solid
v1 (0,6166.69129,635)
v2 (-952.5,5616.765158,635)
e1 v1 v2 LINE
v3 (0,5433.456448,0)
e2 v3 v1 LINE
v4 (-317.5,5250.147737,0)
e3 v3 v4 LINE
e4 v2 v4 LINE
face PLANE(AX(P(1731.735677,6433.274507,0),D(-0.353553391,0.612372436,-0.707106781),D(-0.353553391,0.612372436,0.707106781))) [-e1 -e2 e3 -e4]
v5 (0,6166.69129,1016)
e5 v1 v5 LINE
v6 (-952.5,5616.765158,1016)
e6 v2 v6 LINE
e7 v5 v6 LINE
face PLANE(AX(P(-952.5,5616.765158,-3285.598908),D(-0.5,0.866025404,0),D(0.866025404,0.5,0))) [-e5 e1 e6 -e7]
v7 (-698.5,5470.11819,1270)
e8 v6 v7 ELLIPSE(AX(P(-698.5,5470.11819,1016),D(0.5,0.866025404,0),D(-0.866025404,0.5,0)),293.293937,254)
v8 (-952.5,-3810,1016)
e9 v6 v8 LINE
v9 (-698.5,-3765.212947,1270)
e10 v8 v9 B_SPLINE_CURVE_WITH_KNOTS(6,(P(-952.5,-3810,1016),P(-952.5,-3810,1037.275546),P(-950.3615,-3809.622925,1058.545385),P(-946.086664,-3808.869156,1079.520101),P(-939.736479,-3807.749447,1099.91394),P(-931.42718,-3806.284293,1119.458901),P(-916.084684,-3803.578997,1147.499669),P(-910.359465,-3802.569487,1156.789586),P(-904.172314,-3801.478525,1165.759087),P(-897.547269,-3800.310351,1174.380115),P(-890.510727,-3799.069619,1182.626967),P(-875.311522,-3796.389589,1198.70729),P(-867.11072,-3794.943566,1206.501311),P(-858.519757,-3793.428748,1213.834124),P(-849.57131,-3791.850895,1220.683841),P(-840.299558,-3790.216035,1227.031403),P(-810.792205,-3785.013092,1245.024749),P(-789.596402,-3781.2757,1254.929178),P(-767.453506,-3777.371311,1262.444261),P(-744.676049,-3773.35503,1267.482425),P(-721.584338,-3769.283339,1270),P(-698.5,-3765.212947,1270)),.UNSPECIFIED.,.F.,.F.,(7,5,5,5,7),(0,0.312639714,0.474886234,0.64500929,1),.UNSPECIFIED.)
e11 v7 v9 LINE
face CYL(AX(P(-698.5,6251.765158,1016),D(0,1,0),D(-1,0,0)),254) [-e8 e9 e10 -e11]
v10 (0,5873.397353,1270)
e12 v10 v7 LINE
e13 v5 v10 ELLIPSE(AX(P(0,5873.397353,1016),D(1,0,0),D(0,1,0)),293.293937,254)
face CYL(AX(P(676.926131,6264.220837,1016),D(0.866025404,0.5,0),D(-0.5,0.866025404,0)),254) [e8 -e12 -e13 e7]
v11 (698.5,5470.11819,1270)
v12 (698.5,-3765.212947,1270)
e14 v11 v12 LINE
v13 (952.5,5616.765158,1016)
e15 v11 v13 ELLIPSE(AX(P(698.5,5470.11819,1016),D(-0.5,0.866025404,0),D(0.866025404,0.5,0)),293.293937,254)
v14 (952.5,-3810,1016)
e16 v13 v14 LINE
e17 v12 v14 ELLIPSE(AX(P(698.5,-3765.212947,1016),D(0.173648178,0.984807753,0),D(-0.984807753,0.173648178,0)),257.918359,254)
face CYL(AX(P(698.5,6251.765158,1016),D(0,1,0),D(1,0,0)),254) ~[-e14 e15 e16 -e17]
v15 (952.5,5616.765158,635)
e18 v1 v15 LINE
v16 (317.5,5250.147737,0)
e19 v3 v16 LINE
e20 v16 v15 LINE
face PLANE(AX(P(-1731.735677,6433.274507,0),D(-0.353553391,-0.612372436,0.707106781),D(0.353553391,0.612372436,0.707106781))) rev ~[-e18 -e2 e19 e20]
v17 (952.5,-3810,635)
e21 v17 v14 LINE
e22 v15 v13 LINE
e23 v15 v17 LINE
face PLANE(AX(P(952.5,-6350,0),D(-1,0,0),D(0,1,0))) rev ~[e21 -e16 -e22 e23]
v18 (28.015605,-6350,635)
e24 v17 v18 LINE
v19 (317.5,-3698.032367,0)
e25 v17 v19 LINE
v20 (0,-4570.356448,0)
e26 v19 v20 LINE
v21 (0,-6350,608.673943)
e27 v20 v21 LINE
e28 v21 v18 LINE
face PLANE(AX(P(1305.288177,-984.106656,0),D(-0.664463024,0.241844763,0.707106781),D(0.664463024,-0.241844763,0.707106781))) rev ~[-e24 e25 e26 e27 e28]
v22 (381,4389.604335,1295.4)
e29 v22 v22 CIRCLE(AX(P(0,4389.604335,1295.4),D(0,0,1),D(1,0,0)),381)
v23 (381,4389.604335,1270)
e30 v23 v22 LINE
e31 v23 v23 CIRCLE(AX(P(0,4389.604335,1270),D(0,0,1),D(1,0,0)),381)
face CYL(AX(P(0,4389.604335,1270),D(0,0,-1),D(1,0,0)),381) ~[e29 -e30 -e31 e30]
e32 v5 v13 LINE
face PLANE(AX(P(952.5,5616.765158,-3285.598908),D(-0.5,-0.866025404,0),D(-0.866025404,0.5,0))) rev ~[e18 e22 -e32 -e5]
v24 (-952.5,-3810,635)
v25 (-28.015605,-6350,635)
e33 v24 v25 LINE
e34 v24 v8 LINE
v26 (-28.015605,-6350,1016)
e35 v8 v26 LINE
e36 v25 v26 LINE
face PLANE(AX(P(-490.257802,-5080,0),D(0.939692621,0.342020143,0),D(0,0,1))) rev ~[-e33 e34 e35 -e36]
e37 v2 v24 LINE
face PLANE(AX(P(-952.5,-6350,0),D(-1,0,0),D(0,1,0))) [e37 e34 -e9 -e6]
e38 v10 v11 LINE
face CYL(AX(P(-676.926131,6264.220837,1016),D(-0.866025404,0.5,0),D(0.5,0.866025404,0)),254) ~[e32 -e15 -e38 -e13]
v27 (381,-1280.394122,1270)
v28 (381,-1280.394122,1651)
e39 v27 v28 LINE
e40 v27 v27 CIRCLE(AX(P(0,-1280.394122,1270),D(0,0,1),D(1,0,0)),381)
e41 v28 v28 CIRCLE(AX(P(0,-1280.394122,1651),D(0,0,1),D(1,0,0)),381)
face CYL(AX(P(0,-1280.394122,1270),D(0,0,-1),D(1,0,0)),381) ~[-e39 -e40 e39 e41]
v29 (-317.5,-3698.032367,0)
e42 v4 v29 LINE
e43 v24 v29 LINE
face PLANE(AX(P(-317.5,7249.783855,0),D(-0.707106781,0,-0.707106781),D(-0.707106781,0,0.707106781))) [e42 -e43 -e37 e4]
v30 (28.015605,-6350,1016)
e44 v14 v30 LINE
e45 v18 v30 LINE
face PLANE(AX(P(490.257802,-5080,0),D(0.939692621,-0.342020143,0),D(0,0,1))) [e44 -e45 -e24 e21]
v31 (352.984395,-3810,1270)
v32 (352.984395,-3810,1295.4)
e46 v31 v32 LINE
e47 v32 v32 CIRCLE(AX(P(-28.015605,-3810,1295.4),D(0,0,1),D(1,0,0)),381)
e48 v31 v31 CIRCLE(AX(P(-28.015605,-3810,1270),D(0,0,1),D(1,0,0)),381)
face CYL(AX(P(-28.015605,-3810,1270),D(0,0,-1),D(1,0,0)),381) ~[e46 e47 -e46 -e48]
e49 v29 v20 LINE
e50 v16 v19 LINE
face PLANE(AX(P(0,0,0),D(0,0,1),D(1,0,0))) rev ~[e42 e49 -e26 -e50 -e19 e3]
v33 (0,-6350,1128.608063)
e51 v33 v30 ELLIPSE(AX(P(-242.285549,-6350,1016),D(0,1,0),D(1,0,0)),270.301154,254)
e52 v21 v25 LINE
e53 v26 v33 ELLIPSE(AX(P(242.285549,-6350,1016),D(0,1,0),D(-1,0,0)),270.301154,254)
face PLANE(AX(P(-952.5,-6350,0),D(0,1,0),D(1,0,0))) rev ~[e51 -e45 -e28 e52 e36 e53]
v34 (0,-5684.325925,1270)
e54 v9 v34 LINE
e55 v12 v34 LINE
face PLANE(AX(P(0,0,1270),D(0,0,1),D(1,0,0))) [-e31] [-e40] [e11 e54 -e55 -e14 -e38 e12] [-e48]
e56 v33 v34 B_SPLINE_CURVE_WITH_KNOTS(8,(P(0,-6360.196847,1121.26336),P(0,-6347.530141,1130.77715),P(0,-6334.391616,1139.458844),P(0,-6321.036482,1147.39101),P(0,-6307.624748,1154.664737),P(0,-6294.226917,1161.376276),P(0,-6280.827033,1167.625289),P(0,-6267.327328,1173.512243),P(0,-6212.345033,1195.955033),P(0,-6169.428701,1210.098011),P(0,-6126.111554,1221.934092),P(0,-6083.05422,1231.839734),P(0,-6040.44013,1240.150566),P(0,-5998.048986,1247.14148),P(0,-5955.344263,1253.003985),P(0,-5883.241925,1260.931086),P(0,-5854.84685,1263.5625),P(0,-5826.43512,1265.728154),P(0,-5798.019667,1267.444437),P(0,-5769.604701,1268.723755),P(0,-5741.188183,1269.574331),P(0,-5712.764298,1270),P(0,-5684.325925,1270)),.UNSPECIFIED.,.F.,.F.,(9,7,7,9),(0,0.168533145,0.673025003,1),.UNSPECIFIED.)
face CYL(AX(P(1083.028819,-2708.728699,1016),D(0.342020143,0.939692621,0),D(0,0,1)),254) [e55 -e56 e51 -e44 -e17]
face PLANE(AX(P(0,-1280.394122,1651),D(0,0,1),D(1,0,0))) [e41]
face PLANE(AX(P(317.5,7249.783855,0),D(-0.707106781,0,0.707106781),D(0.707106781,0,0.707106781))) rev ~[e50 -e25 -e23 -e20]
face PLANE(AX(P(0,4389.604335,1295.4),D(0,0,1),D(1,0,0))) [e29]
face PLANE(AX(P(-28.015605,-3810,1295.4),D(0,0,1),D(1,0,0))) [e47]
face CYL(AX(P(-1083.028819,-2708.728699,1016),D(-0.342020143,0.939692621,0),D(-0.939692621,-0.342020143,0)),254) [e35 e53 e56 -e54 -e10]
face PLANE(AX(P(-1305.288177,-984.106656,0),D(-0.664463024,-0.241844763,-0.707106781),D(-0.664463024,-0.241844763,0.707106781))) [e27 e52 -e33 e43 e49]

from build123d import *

# Parameters (mm, degrees)
F0_W          = 1905
F0_H          = 12700
F1_DEPTH      = 1270
F2_SIZE2      = 924.4843950362
F2_SIZE       = 2540
F2_2_SIZE2    = 924.4843950362
F2_2_SIZE     = 2540
F3_T1_DEPTH   = 7841.1978168008
F4_R          = 381
F5_DEPTH      = 381
F6_R          = 381
F7_DEPTH      = 25.4
F8_R          = 381
F9_DEPTH      = 25.4
F10_T1_DEPTH  = 7112.1620249564
F10_T3_DEPTH  = 13835.9156409968
F10_T5_DEPTH  = 4365.8896575229
F10_T7_DEPTH  = 4365.8896575229
F10_T9_DEPTH  = 7112.1620249564
F10_T14_DEPTH = 3322.0686046444
F10_T19_DEPTH = 3322.0686046444
F11_T1_DEPTH  = 11141.2651581292
F11_T3_DEPTH  = 4417.5115420888
F11_T5_DEPTH  = 4417.5115420888
F11_T7_DEPTH  = 2369.8522628062
F11_T9_DEPTH  = 2369.8522628062


# Not quite as in the source:
# - a fillet or chamfer that OpenCascade refuses, or shapes differently, is made with other operations: its cross-section is extruded or revolved along the edge and cut away or added


with BuildPart() as f1:
    # F0 (on Top) → F1 (new body)
    with BuildSketch(Plane.XY):
        Rectangle(F0_W, F0_H)
    extrude(amount=F1_DEPTH)

    # F2
    f2_edges = [f1.edges().sort_by_distance(p)[0] for p in [
        (952.5, -6350, 635),
    ]]
    f2_side = f1.faces().sort_by_distance((952.5, 0, 635))[0]
    chamfer(f2_edges, length=F2_SIZE, length2=F2_SIZE2, reference=f2_side)

    # F2#2
    f2_2_edges = [f1.edges().sort_by_distance(p)[0] for p in [
        (-952.5, -6350, 635),
    ]]
    f2_2_side = f1.faces().sort_by_distance((-952.5, 0, 635))[0]
    chamfer(f2_2_edges, length=F2_2_SIZE, length2=F2_2_SIZE2, reference=f2_2_side)

    # F3: chamfer of 1270 x 733.2348418708 on 2 edges, made by hand

    # F3_s2 → F3_t1 (cut)
    with BuildSketch(Plane.XY.offset(-3285.5989084004)):
        Polygon((952.5, 5616.7651581292), (-317.5, 6350), (952.5, 6350), align=None)
        Polygon((-952.5, 5616.7651581292), (317.5, 6350), (-952.5, 6350), align=None)
    extrude(amount=F3_T1_DEPTH, mode=Mode.SUBTRACT)

    # F4 (on face) → F5 (join)
    with BuildSketch(Plane.XY.offset(1270)):
        with Locations((0, -1280.3941220168)):
            Circle(F4_R)
    extrude(amount=F5_DEPTH)

    # F6 (on face) → F7 (join)
    with BuildSketch(Plane.XY.offset(1270)):
        with Locations((0, 4389.6043354776)):
            Circle(F6_R)
    extrude(amount=F7_DEPTH)

    # F8 (on face) → F9 (join)
    with BuildSketch(Plane.XY.offset(1270)):
        with Locations((-28.0156049638, -3810)):
            Circle(F8_R)
    extrude(amount=F9_DEPTH)

    # F10: chamfer of 635 on 7 edges, made by hand

    # F10_s2 → F10_t1 (cut)
    with BuildSketch(Plane(origin=(163.5960713175, -449.4765118562, 0), x_dir=(0, 0, 1), z_dir=(0.3420201433, -0.9396926208, 0))):
        Polygon((0, 1563.1539673694), (635, 2198.1539673694), (0, 2198.1539673694), align=None)
    extrude(amount=F10_T1_DEPTH, mode=Mode.SUBTRACT)

    # F10_s4 → F10_t3 (cut)
    with BuildSketch(Plane.XZ.offset(-7249.7838554876)):
        Polygon((-317.5, 0), (-952.5, 635), (-952.5, 0), align=None)
        Polygon((317.5, 0), (952.5, 635), (952.5, 0), align=None)
    extrude(amount=F10_T3_DEPTH, mode=Mode.SUBTRACT)

    # F10_s6 → F10_t5 (cut)
    with BuildSketch(Plane(origin=(4084.4913337829, 2358.1821710622, 0), x_dir=(0, 0, 1), z_dir=(-0.8660254038, -0.5, 0))):
        Polygon((0, 4705.5113140312), (635, 5340.5113140312), (0, 5340.5113140312), align=None)
    extrude(amount=F10_T5_DEPTH, mode=Mode.SUBTRACT)

    # F10_s8 → F10_t7 (cut)
    with BuildSketch(Plane(origin=(-4084.4913337829, 2358.1821710622, 0), x_dir=(0, 0, 1), z_dir=(0.8660254038, -0.5, 0))):
        Polygon((0, -4705.5113140312), (635, -5340.5113140312), (0, -5340.5113140312), align=None)
    extrude(amount=F10_T7_DEPTH, mode=Mode.SUBTRACT)

    # F10_s10 → F10_t9 (cut)
    with BuildSketch(Plane(origin=(-163.5960713175, -449.4765118562, 0), x_dir=(0, 0, 1), z_dir=(-0.3420201433, -0.9396926208, 0))):
        Polygon((0, -1563.1539673694), (635, -2198.1539673694), (0, -2198.1539673694), align=None)
    extrude(amount=F10_T9_DEPTH, mode=Mode.SUBTRACT)


with BuildPart() as f10_tool12:
    # F10_s13 → F10_t14 (new body)
    with BuildSketch(Plane.YZ.offset(-1661.0343023222)):
        Polygon((-6350, 635), (-5715, 0), (-6350, 0), align=None)
    extrude(amount=F10_T14_DEPTH)

    split(bisect_by=Plane(origin=(-734.4421241446, -267.3150719799, -781.5769836847), x_dir=(0.3420201433, -0.9396926208, 0), z_dir=(-0.6644630244, -0.2418447626, -0.7071067812)), keep=Keep.TOP)


with BuildPart() as f1_1:
    add(f1.part)

    # F10_t11: cut F10_tool12
    add(f10_tool12.part, mode=Mode.SUBTRACT)


with BuildPart() as f10_tool17:
    # F10_s18 → F10_t19 (new body)
    with BuildSketch(Plane.YZ.offset(-1661.0343023222)):
        Polygon((-6350, 635), (-5715, 0), (-6350, 0), align=None)
    extrude(amount=F10_T19_DEPTH)

    split(bisect_by=Plane(origin=(734.4421241446, -267.3150719799, -781.5769836847), x_dir=(0.3420201433, 0.9396926208, 0), z_dir=(0.6644630244, -0.2418447626, -0.7071067812)), keep=Keep.TOP)


with BuildPart() as f1_2:
    add(f1_1.part)

    # F10_t16: cut F10_tool17
    add(f10_tool17.part, mode=Mode.SUBTRACT)

    # F11: fillet of radius 254 on 6 edges, made by hand

    # F11_s2 → F11_t1 (cut)
    with BuildSketch(Plane.XZ.offset(-6251.7651581292)):
        with BuildLine():
            ThreePointArc((952.5, 1016), (878.1051224214, 1195.6051224214), (698.5, 1270))
            Line((698.5, 1270), (952.5, 1270))
            Line((952.5, 1270), (952.5, 1016))
        make_face()
        with BuildLine():
            ThreePointArc((-952.5, 1016), (-878.1051224214, 1195.6051224214), (-698.5, 1270))
            Line((-698.5, 1270), (-952.5, 1270))
            Line((-952.5, 1270), (-952.5, 1016))
        make_face()
    extrude(amount=F11_T1_DEPTH, mode=Mode.SUBTRACT)

    # F11_s4 → F11_t3 (cut)
    with BuildSketch(Plane(origin=(-743.8783177682, -2043.78888089, 0), x_dir=(0, 0, 1), z_dir=(-0.3420201433, -0.9396926208, 0))):
        with BuildLine():
            ThreePointArc((1270, -1944.1539673694), (1195.6051224214, -2123.7590897908), (1016, -2198.1539673694))
            Line((1016, -2198.1539673694), (1270, -2198.1539673694))
            Line((1270, -2198.1539673694), (1270, -1944.1539673694))
        make_face()
    extrude(amount=F11_T3_DEPTH, mode=Mode.SUBTRACT)

    # F11_s6 → F11_t5 (cut)
    with BuildSketch(Plane(origin=(743.8783177682, -2043.7888808901, 0), x_dir=(0, 0, 1), z_dir=(0.3420201433, -0.9396926208, 0))):
        with BuildLine():
            ThreePointArc((1016, 2198.1539673694), (1195.6051224214, 2123.7590897907), (1270, 1944.1539673694))
            Line((1270, 1944.1539673694), (1270, 2198.1539673694))
            Line((1270, 2198.1539673694), (1016, 2198.1539673694))
        make_face()
    extrude(amount=F11_T5_DEPTH, mode=Mode.SUBTRACT)

    # F11_s8 → F11_t7 (cut)
    with BuildSketch(Plane(origin=(3220.1817884187, 1859.172822383, 0), x_dir=(0, 0, 1), z_dir=(-0.8660254038, -0.5, 0))):
        with BuildLine():
            ThreePointArc((1016, 5340.5113140312), (1195.6051224214, 5266.1164364526), (1270, 5086.5113140312))
            Line((1270, 5086.5113140312), (1270, 5340.5113140312))
            Line((1270, 5340.5113140312), (1016, 5340.5113140312))
        make_face()
    extrude(amount=F11_T7_DEPTH, mode=Mode.SUBTRACT)

    # F11_s10 → F11_t9 (cut)
    with BuildSketch(Plane(origin=(-3220.1817884187, 1859.172822383, 0), x_dir=(0, 0, 1), z_dir=(0.8660254038, -0.5, 0))):
        with BuildLine():
            ThreePointArc((1016, -5340.5113140312), (1195.6051224214, -5266.1164364526), (1270, -5086.5113140312))
            Line((1270, -5086.5113140312), (1270, -5340.5113140312))
            Line((1270, -5340.5113140312), (1016, -5340.5113140312))
        make_face()
    extrude(amount=F11_T9_DEPTH, mode=Mode.SUBTRACT)


solid = f1_2.part
